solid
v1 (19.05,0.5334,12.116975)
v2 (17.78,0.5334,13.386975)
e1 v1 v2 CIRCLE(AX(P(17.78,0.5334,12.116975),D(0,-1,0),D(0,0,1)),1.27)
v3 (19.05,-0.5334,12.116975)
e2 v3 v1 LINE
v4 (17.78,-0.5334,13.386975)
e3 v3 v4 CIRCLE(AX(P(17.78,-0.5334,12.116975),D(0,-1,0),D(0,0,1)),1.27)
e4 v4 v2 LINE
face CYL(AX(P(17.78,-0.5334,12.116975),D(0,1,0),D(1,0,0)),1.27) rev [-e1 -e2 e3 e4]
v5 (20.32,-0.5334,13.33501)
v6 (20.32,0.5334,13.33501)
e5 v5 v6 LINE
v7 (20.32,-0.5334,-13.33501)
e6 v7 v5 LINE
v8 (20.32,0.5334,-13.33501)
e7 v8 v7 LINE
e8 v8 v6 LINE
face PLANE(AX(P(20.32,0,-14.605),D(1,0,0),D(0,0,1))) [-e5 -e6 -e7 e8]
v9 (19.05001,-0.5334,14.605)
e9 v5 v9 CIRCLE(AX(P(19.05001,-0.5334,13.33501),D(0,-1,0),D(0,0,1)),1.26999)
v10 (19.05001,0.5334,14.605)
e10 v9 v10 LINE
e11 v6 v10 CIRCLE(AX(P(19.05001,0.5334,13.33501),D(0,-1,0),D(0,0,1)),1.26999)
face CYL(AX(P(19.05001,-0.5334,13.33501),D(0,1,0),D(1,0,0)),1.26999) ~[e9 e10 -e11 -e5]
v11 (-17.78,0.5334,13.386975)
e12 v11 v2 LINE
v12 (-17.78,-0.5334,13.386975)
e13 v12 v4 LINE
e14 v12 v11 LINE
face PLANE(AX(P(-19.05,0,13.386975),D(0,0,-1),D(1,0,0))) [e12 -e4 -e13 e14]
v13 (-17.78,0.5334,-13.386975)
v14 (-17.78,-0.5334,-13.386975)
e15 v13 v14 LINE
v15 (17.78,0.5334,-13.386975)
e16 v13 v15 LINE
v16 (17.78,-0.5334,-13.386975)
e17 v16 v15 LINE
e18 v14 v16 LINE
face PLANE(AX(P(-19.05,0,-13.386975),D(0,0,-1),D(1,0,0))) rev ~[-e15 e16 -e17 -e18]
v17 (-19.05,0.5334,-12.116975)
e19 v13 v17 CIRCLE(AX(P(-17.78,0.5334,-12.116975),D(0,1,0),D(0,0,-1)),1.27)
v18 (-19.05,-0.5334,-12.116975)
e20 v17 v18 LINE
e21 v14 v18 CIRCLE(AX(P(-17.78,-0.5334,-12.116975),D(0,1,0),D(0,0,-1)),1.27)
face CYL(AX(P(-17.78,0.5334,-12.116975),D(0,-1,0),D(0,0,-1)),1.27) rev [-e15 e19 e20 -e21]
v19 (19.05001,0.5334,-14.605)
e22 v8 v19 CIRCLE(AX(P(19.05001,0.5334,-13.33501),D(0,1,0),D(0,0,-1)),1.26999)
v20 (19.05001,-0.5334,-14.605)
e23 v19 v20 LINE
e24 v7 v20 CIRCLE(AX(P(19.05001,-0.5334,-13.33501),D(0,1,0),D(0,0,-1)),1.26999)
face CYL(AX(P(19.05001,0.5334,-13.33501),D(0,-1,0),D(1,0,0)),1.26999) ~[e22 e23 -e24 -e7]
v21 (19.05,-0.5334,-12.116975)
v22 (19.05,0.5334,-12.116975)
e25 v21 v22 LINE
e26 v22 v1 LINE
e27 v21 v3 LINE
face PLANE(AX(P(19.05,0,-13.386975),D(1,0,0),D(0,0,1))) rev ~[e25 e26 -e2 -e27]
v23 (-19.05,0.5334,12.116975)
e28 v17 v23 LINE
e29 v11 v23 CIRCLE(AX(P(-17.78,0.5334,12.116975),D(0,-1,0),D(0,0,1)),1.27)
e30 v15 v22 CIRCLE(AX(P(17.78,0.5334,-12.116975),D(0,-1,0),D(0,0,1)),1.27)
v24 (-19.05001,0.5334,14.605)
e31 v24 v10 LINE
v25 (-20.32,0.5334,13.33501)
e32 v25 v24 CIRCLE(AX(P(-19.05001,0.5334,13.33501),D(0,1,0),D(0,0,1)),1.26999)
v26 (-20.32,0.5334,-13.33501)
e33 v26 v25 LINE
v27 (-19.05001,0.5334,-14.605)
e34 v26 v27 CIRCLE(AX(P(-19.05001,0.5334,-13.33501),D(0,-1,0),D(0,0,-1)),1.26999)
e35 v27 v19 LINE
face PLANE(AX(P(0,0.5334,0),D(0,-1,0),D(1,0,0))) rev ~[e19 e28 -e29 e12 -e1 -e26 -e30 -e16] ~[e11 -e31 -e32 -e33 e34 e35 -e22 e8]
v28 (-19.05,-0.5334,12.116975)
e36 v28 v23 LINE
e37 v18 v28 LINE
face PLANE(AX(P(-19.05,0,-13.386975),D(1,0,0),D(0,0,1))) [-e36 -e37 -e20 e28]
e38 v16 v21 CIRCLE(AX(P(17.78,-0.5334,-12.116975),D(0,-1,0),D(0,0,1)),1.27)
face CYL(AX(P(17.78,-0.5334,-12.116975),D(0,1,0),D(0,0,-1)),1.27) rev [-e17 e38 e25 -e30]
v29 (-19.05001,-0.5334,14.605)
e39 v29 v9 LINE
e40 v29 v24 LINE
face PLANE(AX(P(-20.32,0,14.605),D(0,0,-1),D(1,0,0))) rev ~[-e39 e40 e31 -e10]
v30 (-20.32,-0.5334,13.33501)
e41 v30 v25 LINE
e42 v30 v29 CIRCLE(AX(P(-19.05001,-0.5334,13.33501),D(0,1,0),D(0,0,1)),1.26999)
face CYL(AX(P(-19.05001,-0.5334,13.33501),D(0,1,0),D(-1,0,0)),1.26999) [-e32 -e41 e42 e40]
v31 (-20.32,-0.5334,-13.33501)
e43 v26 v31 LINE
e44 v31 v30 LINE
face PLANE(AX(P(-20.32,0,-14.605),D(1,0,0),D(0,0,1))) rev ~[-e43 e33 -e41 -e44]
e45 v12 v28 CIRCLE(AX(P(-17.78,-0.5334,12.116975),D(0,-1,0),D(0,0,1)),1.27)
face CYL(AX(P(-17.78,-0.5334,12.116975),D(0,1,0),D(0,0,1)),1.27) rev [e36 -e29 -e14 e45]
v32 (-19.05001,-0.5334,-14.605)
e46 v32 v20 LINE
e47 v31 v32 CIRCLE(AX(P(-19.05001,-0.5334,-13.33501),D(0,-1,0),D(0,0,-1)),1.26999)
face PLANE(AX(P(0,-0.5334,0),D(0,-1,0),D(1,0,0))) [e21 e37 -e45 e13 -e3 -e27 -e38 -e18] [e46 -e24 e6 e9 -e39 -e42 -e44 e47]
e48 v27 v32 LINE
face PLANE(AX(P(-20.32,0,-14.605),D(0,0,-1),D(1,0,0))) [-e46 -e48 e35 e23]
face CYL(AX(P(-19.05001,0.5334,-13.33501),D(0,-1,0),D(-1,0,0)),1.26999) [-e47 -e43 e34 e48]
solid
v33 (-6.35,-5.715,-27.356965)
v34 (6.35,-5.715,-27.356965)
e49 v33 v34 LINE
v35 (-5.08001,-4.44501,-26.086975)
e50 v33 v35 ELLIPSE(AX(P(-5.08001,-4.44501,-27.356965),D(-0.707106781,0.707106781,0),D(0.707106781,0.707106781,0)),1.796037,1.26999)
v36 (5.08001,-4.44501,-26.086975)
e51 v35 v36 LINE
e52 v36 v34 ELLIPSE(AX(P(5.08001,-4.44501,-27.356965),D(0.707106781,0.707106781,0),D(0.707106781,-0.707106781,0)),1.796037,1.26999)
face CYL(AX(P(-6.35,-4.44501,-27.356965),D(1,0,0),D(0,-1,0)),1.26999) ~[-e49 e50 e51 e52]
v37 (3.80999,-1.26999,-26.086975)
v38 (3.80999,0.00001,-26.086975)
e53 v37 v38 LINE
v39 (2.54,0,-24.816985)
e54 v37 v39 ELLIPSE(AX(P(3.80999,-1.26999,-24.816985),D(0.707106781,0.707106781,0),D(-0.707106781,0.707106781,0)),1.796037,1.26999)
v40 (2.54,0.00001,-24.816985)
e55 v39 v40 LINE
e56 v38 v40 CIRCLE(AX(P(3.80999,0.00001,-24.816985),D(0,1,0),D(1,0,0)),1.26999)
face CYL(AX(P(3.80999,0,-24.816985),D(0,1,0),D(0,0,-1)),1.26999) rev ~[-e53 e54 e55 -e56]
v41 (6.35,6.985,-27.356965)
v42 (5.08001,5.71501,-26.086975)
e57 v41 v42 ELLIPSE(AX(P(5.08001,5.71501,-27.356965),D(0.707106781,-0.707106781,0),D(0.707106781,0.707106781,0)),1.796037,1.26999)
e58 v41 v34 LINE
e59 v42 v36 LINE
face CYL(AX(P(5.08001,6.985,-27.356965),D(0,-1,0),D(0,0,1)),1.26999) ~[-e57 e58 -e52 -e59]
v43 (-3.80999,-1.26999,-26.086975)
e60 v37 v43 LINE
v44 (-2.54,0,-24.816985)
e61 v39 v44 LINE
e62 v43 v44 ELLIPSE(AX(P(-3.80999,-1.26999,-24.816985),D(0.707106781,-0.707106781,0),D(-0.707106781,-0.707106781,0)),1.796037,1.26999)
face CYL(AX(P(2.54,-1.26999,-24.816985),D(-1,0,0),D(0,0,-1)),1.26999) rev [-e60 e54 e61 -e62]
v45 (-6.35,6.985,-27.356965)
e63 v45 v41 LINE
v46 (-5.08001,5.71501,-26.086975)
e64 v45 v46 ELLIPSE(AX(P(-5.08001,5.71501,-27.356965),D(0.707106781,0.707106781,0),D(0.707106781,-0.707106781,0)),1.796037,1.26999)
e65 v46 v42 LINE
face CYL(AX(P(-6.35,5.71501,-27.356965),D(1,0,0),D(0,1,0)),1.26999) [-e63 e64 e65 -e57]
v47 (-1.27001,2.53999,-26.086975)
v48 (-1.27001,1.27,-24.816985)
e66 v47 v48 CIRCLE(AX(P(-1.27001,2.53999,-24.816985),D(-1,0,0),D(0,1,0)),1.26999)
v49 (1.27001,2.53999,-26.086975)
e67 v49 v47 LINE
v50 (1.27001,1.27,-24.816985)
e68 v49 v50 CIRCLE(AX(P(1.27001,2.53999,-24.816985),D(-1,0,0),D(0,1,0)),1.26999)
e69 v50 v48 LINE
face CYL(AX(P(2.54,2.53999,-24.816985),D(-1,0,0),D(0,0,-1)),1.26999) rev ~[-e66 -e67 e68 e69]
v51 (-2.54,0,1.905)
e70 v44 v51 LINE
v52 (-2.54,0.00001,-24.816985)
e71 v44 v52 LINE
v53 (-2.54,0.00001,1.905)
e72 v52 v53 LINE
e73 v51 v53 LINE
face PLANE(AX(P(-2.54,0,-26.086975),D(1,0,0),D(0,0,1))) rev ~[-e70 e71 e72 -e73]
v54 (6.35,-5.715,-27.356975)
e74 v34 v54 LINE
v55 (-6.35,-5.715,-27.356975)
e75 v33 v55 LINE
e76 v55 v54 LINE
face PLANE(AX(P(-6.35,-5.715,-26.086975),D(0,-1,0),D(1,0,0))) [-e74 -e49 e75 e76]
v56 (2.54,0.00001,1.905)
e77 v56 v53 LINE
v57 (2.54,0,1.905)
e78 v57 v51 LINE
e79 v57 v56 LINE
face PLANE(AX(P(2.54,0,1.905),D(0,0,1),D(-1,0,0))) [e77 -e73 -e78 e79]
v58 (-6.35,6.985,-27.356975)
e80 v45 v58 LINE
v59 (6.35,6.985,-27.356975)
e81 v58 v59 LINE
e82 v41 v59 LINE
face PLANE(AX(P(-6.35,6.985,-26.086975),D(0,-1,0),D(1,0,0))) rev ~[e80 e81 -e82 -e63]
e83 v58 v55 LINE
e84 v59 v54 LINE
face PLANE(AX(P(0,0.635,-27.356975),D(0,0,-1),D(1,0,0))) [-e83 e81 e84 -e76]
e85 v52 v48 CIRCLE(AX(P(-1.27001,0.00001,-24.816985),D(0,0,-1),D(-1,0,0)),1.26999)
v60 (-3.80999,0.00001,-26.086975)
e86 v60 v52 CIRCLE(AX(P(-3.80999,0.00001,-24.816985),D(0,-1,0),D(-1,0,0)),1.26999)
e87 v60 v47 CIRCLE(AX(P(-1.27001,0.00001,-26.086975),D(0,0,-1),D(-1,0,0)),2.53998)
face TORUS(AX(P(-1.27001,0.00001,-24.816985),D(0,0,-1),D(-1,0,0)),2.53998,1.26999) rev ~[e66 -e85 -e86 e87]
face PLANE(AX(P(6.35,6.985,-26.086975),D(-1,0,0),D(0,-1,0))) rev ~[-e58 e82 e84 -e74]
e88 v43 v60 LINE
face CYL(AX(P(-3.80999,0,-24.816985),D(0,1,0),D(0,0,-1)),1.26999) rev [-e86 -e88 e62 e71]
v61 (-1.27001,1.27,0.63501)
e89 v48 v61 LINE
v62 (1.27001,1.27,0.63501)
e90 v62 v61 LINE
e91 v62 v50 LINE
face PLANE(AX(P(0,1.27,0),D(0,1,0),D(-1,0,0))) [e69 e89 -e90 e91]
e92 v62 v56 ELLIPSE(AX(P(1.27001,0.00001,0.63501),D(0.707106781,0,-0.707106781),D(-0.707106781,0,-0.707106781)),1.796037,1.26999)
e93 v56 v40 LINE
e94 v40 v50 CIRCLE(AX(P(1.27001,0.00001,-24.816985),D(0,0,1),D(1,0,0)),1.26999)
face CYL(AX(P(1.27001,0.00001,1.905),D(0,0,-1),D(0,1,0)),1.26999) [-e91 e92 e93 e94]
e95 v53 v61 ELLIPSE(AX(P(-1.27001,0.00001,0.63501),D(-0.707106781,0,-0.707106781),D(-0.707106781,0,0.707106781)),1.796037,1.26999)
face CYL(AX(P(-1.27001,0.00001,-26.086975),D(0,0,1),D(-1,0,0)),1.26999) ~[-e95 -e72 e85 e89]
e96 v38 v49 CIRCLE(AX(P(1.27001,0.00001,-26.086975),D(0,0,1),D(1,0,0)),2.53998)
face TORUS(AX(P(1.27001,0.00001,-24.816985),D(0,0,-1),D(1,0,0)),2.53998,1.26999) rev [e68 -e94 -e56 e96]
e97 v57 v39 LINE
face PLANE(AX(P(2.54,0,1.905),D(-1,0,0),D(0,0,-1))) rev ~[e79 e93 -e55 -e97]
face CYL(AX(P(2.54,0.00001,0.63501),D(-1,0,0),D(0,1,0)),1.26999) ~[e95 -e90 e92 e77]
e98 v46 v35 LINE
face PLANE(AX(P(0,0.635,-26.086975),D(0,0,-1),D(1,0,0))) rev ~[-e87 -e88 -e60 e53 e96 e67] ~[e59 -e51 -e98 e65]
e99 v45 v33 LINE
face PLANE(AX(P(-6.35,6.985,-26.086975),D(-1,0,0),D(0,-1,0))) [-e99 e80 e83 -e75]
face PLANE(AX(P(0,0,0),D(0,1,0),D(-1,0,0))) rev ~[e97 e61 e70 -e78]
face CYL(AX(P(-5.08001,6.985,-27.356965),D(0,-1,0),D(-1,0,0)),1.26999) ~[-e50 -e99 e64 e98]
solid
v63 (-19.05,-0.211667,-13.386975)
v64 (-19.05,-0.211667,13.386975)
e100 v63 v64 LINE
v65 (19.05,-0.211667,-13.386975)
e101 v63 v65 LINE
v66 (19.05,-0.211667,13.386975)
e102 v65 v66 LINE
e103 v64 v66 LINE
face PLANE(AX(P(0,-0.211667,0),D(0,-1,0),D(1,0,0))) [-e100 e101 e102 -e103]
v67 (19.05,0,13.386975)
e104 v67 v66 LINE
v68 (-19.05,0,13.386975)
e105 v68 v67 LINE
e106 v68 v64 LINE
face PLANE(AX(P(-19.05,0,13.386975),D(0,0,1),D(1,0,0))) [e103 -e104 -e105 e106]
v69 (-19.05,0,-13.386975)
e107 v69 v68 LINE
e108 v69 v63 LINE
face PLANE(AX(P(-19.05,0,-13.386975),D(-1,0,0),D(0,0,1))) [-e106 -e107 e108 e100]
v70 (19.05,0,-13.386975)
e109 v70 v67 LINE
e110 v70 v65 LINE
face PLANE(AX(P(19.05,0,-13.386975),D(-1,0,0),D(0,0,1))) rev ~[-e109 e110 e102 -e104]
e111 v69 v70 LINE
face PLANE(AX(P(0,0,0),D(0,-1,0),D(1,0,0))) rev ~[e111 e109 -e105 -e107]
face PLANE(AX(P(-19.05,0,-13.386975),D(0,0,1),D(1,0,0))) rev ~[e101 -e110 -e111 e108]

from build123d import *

# Parameters (mm, degrees)
F0_W     = 38.1
F0_H     = 26.7739508559
F1_DEPTH = 0.2116666666
F0_W_2   = 40.64
F0_H_2   = 29.21
F2_DEPTH = 0.5334
F3_W     = 5.08
F3_H     = 3.81
F3_H_2   = 11.481975428
F3_H_3   = 12.7
F4_DEPTH = 1.27
F5_W     = 12.7
F5_H     = 12.7
F6_DEPTH = 1.27
F7_R     = 1.26999
F7_2_R   = 1.26999
F8_R     = 1.27


# Not quite as in the source:
# - a fillet or chamfer is up to 0.001 mm smaller than in the source, because OpenCascade refuses the exact size


with BuildPart() as f1:
    # F0 (on Front) → F1 (new body)
    with BuildSketch(Plane.XZ):
        Rectangle(F0_W, F0_H)
    extrude(amount=F1_DEPTH)


with BuildPart() as f2:
    # F0 (on Front) → F2 (new body, symmetric)
    with BuildSketch(Plane.XZ):
        Rectangle(F0_W_2, F0_H_2)
        Rectangle(F0_W, F0_H, mode=Mode.SUBTRACT)
    extrude(amount=F2_DEPTH, both=True)

    # F7#2 (radius 1.27 in the source; OpenCascade refuses exactly that, so slightly less here)
    f7_2_edges = [f2.edges().sort_by_distance(p)[0] for p in [
        (-20.32, 0, -14.605),
        (20.32, 0, -14.605),
        (-20.32, 0, 14.605),
        (20.32, 0, 14.605),
    ]]
    fillet(f7_2_edges, radius=F7_2_R)

    # F8
    f8_edges = [f2.edges().sort_by_distance(p)[0] for p in [
        (-19.05, 0, 13.386975),
        (19.05, 0, 13.386975),
        (-19.05, 0, -13.386975),
        (19.05, 0, -13.386975),
    ]]
    fillet(f8_edges, radius=F8_R)


with BuildPart() as f4:
    # F3 (on face) → F4 (new body)
    with BuildSketch(Plane(origin=(0, 0, 0), x_dir=(-1, 0, 0), z_dir=(0, 1, 0))):
        Rectangle(F3_W, F3_H)
        with Locations((0, -7.645987714)):
            Rectangle(F3_W, F3_H_2)
        with Locations((0, -19.736975428)):
            Rectangle(F3_W, F3_H_3)
    extrude(amount=F4_DEPTH)

    # F5 (on face) → F6 (join)
    with BuildSketch(Plane(origin=(0, 0, -26.086975428), x_dir=(1, 0, 0), z_dir=(0, 0, -1))):
        with Locations((0, -0.635)):
            Rectangle(F5_W, F5_H)
    extrude(amount=F6_DEPTH)

    # F7 (radius 1.27 in the source; OpenCascade refuses exactly that, so slightly less here)
    f7_edges = [f4.edges().sort_by_distance(p)[0] for p in [
        (0, 0, -26.086975),
        (-2.54, 0.635, -26.086975),
        (2.54, 0.635, -26.086975),
        (0, 1.27, -26.086975),
        (0, 6.985, -26.086975),
        (6.35, 0.635, -26.086975),
        (0, -5.715, -26.086975),
        (-6.35, 0.635, -26.086975),
        (2.54, 1.27, -12.090988),
        (-2.54, 1.27, -12.090988),
        (0, 1.27, 1.905),
    ]]
    fillet(f7_edges, radius=F7_R)


solid = Compound([f1.part, f2.part, f4.part])
